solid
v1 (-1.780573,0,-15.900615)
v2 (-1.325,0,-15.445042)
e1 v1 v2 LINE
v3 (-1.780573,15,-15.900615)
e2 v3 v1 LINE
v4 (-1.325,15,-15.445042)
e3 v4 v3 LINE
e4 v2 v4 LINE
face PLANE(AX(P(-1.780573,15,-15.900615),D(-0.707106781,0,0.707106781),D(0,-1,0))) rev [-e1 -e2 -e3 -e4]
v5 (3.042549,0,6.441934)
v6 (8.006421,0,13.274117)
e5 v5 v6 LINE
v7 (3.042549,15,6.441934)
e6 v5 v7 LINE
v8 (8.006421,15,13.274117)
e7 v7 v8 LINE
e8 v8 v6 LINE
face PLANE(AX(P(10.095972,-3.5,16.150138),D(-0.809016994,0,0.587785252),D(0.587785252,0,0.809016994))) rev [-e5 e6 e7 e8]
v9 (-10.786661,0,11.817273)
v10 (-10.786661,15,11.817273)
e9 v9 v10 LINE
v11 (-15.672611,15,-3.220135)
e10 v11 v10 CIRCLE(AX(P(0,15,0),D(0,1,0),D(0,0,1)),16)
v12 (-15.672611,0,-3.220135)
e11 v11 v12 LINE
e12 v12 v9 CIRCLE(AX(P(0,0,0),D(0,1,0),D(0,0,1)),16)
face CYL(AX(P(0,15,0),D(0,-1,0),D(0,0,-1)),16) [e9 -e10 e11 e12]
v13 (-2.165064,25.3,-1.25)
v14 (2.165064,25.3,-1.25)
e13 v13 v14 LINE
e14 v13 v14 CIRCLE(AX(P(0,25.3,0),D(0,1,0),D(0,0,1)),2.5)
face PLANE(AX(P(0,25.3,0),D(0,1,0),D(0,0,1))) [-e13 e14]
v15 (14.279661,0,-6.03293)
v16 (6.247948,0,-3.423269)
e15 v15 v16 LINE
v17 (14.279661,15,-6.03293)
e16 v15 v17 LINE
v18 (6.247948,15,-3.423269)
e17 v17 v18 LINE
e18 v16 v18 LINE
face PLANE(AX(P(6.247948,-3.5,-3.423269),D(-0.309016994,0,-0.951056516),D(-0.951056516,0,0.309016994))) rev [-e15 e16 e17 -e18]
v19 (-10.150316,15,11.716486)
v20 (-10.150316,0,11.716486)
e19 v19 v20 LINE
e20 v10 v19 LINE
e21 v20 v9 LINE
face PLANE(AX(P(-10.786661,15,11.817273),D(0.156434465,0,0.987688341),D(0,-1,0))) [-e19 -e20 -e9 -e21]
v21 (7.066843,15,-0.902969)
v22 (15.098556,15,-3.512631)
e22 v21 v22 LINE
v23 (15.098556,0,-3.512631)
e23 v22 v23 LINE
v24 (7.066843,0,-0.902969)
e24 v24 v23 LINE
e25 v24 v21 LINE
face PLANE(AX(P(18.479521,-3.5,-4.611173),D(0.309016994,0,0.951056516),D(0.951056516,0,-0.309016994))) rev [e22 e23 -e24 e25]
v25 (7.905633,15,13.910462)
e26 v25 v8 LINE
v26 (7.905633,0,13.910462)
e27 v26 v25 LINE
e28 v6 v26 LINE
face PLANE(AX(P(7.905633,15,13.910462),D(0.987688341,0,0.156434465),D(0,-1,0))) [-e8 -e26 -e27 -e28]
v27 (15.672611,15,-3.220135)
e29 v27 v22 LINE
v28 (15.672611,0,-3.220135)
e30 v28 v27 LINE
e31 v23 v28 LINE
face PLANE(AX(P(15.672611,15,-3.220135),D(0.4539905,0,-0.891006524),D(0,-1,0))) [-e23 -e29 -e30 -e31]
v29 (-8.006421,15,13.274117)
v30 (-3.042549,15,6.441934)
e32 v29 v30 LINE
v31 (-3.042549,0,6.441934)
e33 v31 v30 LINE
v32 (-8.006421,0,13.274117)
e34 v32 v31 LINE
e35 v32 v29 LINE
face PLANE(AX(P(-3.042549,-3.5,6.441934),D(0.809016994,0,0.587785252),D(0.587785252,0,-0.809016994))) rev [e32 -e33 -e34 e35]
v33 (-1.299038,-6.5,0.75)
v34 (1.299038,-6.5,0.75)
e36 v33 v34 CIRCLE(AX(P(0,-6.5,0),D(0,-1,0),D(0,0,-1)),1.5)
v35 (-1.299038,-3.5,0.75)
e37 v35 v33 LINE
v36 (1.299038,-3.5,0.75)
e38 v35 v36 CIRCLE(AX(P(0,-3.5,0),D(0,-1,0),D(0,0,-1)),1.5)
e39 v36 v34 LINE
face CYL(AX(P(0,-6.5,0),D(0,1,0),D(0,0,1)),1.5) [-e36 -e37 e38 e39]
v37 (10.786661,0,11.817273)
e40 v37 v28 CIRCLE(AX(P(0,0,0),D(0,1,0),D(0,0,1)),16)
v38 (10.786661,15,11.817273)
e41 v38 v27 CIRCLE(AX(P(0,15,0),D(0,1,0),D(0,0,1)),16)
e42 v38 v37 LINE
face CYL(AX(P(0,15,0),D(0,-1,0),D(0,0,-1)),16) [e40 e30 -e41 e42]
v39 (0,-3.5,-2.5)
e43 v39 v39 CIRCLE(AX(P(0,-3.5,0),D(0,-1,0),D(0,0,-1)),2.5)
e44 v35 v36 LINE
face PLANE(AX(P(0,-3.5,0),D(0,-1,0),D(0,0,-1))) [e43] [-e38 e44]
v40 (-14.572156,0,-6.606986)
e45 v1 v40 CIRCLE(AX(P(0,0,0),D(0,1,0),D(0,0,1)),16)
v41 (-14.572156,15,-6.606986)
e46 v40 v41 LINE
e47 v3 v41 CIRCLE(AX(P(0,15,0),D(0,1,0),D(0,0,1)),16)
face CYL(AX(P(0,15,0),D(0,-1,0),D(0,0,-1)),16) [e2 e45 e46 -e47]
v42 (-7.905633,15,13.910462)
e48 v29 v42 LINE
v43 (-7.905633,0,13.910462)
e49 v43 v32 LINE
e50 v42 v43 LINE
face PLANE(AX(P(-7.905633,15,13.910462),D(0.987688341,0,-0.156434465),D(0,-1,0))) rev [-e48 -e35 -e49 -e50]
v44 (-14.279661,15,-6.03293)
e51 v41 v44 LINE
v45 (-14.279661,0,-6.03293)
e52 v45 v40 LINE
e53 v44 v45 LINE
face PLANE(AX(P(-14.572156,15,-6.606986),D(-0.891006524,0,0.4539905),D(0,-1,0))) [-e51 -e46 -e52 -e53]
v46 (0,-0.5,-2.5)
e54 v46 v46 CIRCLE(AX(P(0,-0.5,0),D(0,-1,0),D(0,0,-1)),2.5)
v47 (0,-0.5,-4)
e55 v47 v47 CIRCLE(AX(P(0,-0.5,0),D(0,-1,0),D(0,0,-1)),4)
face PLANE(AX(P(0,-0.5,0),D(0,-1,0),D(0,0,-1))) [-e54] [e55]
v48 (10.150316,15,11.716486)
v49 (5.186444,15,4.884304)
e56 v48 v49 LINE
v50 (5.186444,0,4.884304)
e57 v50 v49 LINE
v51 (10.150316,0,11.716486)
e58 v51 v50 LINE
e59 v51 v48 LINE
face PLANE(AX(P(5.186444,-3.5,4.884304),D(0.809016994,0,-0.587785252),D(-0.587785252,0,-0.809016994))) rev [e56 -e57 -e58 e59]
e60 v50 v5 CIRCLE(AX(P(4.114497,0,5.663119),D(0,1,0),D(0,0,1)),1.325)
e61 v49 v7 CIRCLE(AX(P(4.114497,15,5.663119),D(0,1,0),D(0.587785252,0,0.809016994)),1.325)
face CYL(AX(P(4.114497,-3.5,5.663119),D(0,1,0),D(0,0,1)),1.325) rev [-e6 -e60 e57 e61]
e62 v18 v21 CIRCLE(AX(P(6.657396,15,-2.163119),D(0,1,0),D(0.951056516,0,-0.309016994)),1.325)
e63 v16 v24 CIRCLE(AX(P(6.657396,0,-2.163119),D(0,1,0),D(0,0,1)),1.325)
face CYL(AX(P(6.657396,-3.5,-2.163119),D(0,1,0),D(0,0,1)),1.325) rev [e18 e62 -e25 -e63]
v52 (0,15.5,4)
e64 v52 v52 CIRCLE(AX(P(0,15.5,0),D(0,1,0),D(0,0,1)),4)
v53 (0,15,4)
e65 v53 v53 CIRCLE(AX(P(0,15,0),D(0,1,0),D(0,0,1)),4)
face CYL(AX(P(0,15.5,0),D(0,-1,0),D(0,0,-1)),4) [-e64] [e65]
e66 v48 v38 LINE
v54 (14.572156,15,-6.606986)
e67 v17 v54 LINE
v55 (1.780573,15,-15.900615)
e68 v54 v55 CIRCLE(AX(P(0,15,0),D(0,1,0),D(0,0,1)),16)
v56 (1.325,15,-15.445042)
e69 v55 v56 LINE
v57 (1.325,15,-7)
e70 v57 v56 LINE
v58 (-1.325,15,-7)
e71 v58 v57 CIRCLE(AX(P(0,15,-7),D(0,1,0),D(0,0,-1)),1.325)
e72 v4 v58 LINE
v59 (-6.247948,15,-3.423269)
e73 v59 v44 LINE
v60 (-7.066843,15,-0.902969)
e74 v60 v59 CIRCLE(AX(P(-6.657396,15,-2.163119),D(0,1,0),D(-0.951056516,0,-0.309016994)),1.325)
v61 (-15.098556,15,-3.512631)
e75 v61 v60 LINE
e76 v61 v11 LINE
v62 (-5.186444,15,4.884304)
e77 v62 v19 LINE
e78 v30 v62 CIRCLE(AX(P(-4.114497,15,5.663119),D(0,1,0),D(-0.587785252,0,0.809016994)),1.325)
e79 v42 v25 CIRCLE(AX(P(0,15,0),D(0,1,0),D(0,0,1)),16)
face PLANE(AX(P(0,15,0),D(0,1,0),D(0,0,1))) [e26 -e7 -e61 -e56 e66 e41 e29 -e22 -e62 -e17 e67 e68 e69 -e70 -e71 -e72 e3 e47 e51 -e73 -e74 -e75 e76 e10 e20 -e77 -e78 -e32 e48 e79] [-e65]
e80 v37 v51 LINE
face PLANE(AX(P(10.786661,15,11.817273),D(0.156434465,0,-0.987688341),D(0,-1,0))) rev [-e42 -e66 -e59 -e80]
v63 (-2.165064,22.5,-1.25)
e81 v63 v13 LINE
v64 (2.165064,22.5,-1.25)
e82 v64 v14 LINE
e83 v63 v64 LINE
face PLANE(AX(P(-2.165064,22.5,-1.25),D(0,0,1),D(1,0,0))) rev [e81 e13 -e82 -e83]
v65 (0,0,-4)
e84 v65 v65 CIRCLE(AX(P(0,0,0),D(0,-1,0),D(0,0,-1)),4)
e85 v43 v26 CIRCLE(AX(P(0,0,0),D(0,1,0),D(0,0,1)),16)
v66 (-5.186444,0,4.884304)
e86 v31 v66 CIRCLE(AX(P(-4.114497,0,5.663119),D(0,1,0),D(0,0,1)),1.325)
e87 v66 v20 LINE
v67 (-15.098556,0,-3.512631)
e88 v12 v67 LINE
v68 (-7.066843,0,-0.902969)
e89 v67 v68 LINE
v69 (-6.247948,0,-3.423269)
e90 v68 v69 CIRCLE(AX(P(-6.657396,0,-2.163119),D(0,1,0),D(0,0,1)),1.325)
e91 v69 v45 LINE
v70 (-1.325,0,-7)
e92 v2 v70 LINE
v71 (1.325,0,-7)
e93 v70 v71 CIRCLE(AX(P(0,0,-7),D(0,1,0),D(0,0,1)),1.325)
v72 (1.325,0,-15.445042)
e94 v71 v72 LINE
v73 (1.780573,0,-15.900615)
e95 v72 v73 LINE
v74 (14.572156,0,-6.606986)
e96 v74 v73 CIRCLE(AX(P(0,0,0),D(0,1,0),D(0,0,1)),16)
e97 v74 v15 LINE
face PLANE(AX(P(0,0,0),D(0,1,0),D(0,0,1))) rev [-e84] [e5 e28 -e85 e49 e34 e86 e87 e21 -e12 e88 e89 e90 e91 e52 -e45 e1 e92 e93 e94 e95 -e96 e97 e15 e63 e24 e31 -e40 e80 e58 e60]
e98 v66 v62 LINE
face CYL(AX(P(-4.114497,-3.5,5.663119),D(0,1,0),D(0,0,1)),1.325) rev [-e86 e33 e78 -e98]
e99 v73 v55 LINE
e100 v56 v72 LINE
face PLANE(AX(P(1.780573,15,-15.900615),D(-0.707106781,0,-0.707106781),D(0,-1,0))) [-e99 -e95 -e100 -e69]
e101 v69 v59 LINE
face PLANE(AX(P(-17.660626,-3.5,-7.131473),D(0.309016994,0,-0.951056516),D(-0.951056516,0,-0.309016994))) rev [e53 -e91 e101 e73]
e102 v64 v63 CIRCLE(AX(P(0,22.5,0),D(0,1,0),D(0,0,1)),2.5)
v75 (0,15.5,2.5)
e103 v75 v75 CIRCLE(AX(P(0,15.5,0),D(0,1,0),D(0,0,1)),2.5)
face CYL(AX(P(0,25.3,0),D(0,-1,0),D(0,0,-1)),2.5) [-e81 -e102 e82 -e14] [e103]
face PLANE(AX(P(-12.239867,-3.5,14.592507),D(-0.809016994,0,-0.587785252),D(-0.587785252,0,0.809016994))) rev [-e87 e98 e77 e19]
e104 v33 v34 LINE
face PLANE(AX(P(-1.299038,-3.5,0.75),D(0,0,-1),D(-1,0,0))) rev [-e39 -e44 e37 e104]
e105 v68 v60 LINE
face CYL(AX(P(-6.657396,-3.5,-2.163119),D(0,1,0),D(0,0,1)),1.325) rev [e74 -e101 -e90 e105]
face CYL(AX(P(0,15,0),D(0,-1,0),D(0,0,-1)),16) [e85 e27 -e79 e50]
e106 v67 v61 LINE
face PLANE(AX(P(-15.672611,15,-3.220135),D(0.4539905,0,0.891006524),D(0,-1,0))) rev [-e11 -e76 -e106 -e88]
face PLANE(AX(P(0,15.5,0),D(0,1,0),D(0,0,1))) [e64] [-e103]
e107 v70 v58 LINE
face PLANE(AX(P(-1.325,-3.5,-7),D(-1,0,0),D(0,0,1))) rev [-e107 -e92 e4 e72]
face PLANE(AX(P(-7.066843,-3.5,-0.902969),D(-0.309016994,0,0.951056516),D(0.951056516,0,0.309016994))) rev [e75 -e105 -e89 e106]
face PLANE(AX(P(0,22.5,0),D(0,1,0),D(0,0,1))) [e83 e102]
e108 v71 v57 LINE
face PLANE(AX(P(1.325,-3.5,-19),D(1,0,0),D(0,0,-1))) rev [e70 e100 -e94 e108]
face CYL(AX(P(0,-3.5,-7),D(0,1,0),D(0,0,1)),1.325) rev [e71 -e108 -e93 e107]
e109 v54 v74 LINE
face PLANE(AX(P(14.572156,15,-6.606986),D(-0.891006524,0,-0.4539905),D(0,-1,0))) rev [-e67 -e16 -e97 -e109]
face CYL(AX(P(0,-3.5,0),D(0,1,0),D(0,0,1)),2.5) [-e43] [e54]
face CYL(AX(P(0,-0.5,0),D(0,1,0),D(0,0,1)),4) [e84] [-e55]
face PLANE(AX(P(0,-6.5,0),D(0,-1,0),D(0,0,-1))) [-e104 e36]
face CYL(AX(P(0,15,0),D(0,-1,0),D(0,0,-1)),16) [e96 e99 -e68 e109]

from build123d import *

# Parameters (mm, degrees)
SKETCH_1_R               = 16
EXTRUDE_1_DEPTH          = 15
SKETCH_2_R               = 4
EXTRUDE_2_DEPTH          = 0.5
EXTRUDE_START            = 0.5
SKETCH_3_R               = 4
EXTRUDE_3_DEPTH          = 0.5
SKETCH_4_R               = 2.5
EXTRUDE_4_DEPTH          = 9.8
EXTRUDE_START_2          = 3
SKETCH_5_R               = 2.5
EXTRUDE_5_DEPTH          = 3
CUT_EXTRUDE_START        = -2.8
CUT_EXTRUDE_1_DEPTH      = 2.8
CUT_EXTRUDE_2_DEPTH      = 30.227555491
PATTERN_CIRCULAR_1_COUNT = 5
SKETCH_8_R               = 1.5
EXTRUDE_6_DEPTH          = 3
CHAMFER_1_SIZE           = 0.5
CUT_EXTRUDE_START_2      = -3
CUT_EXTRUDE_3_DEPTH      = 3


with BuildPart() as part:
    # 草图1 → 凸台-拉伸1 (new body)
    with BuildSketch(Plane(origin=(0, 0, 0), x_dir=(1, 0, 0), z_dir=(0, 1, 0))):
        with Locations(Location((0, 0, 0), (0, 0, 270))):
            Circle(SKETCH_1_R)
    extrude(amount=EXTRUDE_1_DEPTH)

    # 草图2 → 凸台-拉伸2 (add)
    with BuildSketch(Plane(origin=(0, 15, 0), x_dir=(1, 0, 0), z_dir=(0, 1, 0))):
        with Locations(Location((0, 0, 0), (0, 0, 270))):
            Circle(SKETCH_2_R)
    extrude(amount=EXTRUDE_2_DEPTH)

    # 草图3 → 凸台-拉伸3 (add)
    with BuildSketch(Plane.XZ.offset(EXTRUDE_START)):
        with Locations(Location((0, 0, 0), (0, 0, 90))):
            Circle(SKETCH_3_R)
    extrude(amount=-EXTRUDE_3_DEPTH)

    # 草图4 → 凸台-拉伸4 (add)
    with BuildSketch(Plane(origin=(0, 15.5, 0), x_dir=(1, 0, 0), z_dir=(0, 1, 0))):
        with Locations(Location((0, 0, 0), (0, 0, 270))):
            Circle(SKETCH_4_R)
    extrude(amount=EXTRUDE_4_DEPTH)

    # 草图5 → 凸台-拉伸5 (add)
    with BuildSketch(Plane.XZ.offset(0.5).offset(EXTRUDE_START_2)):
        with Locations(Location((0, 0, 0), (0, 0, 90))):
            Circle(SKETCH_5_R)
    extrude(amount=-EXTRUDE_5_DEPTH)

    # 草图6 → 切除-拉伸1 (cut)
    with BuildSketch(Plane(origin=(0, 25.3, 0), x_dir=(1, 0, 0), z_dir=(0, 1, 0)).offset(CUT_EXTRUDE_START)):
        with BuildLine():
            Line((-2.165063509, 1.25), (2.165063509, 1.25))
            ThreePointArc((2.165063509, 1.25), (0, 2.5), (-2.165063509, 1.25))
        make_face()
    extrude(amount=CUT_EXTRUDE_1_DEPTH, mode=Mode.SUBTRACT)

    # 草图7 → 切除-拉伸2 (cut, through all)
    with BuildSketch(Plane(origin=(0, 15, 0), x_dir=(1, 0, 0), z_dir=(0, 1, 0))):
        with BuildLine():
            Line((-1.325, 7), (-1.325, 19))
            Line((-1.325, 19), (1.325, 19))
            Line((1.325, 19), (1.325, 7))
            ThreePointArc((1.325, 7), (0, 5.675), (-1.325, 7))
        make_face()
    cut_extrude_2 = extrude(amount=-CUT_EXTRUDE_2_DEPTH, mode=Mode.SUBTRACT)

    # 阵列(圆周)1: 切除-拉伸2 ×5 about axis
    pattern_circular_1_axis = Axis((0, 0, 0), (0, 1, 0))
    for i in range(1, PATTERN_CIRCULAR_1_COUNT):
        add(cut_extrude_2.rotate(pattern_circular_1_axis, i * 360 / PATTERN_CIRCULAR_1_COUNT), mode=Mode.SUBTRACT)

    # 草图8 → 凸台-拉伸6 (add)
    with BuildSketch(Plane.XZ.offset(3.5)):
        with Locations(Location((0, 0, 0), (0, 0, 270))):
            Circle(SKETCH_8_R)
    extrude(amount=EXTRUDE_6_DEPTH)

    # 倒角1
    # the kernel refuses this chamfer: 0.5, 0.463229901 mm, written as the material it takes off along each edge
    with BuildSketch(Plane(origin=(-1.325, 16.285841494, -15.945042333), x_dir=(-0.9952786218717831, 0, 0.09705907914772452), z_dir=(0, -1, 0)), Plane(origin=(14.755188896, 16.285841494, -6.187438941), x_dir=(-0.39986667798550435, 0, -0.9165733139453914), z_dir=(0, -1, 0)), Plane(origin=(10.444208248, 16.285841494, 12.120994764), x_dir=(0.7481474239082289, 0, -0.6635325403471037), z_dir=(0, -1, 0)), Plane(origin=(-8.300313213, 16.285841494, 13.678625683), x_dir=(0.8622472145564707, 0, 0.5064876513693177), z_dir=(0, -1, 0)), Plane(origin=(-15.574083931, 16.285841494, -3.667139173), x_dir=(-0.21524933860740833, 0, 0.9765591237754493), z_dir=(0, -1, 0))) as chamfer_1_piece_1:
        with BuildLine():
            Line((0.457733904, 0), (CHAMFER_1_SIZE * 0.0970590791477, -CHAMFER_1_SIZE * 0.995278621872))
            Line((CHAMFER_1_SIZE * 0.0970590791477, -CHAMFER_1_SIZE * 0.995278621872), (0, 0))
            ThreePointArc((0, 0), (0.235215907, 0.001635702), (0.457733904, 0))
        make_face()
    extrude(amount=17.571682988, mode=Mode.SUBTRACT)
    with BuildSketch(Plane(origin=(1.325, 16.285841494, -15.945042333), x_dir=(0, 0, 1), z_dir=(0, -1, 0)), Plane(origin=(15.574083931, 16.285841494, -3.667139173), x_dir=(-0.9510565162951534, 0, 0.3090169943749483), z_dir=(0, -1, 0)), Plane(origin=(8.300313213, 16.285841494, 13.678625683), x_dir=(-0.5877852522924737, 0, -0.809016994374947), z_dir=(0, -1, 0)), Plane(origin=(-14.755188896, 16.285841494, -6.187438941), x_dir=(0.9510565162951536, 0, 0.3090169943749472), z_dir=(0, -1, 0))) as chamfer_1_piece_2:
        with BuildLine():
            Line((CHAMFER_1_SIZE, 0), (0.044427231, -0.455572769))
            ThreePointArc((0.044427231, -0.455572769), (0.02120186, -0.234264124), (0, 0))
            Line((0, 0), (CHAMFER_1_SIZE, 0))
        make_face()
    extrude(amount=17.571682988, mode=Mode.SUBTRACT)
    with BuildSketch(Plane(origin=(-10.444208248, 16.285841494, 12.120994764), x_dir=(-0.7481474239082269, 0, -0.6635325403471058), z_dir=(0, -1, 0))) as chamfer_1_piece_3:
        with BuildLine():
            Line((0.457733904, 0), (CHAMFER_1_SIZE * 0.0970590791477, CHAMFER_1_SIZE * 0.995278621872))
            Line((CHAMFER_1_SIZE * 0.0970590791477, CHAMFER_1_SIZE * 0.995278621872), (0, 0))
            ThreePointArc((0, 0), (0.235215907, -0.001635702), (0.457733904, 0))
        make_face()
    extrude(amount=17.571682988, mode=Mode.SUBTRACT)

    # 草图9 → 切除-拉伸3 (cut)
    with BuildSketch(Plane.XZ.offset(6.5).offset(CUT_EXTRUDE_START_2)):
        with BuildLine():
            Line((-1.299038106, 0.75), (1.299038106, 0.75))
            ThreePointArc((1.299038106, 0.75), (0, 1.5), (-1.299038106, 0.75))
        make_face()
    extrude(amount=CUT_EXTRUDE_3_DEPTH, mode=Mode.SUBTRACT)


solid = part.part
